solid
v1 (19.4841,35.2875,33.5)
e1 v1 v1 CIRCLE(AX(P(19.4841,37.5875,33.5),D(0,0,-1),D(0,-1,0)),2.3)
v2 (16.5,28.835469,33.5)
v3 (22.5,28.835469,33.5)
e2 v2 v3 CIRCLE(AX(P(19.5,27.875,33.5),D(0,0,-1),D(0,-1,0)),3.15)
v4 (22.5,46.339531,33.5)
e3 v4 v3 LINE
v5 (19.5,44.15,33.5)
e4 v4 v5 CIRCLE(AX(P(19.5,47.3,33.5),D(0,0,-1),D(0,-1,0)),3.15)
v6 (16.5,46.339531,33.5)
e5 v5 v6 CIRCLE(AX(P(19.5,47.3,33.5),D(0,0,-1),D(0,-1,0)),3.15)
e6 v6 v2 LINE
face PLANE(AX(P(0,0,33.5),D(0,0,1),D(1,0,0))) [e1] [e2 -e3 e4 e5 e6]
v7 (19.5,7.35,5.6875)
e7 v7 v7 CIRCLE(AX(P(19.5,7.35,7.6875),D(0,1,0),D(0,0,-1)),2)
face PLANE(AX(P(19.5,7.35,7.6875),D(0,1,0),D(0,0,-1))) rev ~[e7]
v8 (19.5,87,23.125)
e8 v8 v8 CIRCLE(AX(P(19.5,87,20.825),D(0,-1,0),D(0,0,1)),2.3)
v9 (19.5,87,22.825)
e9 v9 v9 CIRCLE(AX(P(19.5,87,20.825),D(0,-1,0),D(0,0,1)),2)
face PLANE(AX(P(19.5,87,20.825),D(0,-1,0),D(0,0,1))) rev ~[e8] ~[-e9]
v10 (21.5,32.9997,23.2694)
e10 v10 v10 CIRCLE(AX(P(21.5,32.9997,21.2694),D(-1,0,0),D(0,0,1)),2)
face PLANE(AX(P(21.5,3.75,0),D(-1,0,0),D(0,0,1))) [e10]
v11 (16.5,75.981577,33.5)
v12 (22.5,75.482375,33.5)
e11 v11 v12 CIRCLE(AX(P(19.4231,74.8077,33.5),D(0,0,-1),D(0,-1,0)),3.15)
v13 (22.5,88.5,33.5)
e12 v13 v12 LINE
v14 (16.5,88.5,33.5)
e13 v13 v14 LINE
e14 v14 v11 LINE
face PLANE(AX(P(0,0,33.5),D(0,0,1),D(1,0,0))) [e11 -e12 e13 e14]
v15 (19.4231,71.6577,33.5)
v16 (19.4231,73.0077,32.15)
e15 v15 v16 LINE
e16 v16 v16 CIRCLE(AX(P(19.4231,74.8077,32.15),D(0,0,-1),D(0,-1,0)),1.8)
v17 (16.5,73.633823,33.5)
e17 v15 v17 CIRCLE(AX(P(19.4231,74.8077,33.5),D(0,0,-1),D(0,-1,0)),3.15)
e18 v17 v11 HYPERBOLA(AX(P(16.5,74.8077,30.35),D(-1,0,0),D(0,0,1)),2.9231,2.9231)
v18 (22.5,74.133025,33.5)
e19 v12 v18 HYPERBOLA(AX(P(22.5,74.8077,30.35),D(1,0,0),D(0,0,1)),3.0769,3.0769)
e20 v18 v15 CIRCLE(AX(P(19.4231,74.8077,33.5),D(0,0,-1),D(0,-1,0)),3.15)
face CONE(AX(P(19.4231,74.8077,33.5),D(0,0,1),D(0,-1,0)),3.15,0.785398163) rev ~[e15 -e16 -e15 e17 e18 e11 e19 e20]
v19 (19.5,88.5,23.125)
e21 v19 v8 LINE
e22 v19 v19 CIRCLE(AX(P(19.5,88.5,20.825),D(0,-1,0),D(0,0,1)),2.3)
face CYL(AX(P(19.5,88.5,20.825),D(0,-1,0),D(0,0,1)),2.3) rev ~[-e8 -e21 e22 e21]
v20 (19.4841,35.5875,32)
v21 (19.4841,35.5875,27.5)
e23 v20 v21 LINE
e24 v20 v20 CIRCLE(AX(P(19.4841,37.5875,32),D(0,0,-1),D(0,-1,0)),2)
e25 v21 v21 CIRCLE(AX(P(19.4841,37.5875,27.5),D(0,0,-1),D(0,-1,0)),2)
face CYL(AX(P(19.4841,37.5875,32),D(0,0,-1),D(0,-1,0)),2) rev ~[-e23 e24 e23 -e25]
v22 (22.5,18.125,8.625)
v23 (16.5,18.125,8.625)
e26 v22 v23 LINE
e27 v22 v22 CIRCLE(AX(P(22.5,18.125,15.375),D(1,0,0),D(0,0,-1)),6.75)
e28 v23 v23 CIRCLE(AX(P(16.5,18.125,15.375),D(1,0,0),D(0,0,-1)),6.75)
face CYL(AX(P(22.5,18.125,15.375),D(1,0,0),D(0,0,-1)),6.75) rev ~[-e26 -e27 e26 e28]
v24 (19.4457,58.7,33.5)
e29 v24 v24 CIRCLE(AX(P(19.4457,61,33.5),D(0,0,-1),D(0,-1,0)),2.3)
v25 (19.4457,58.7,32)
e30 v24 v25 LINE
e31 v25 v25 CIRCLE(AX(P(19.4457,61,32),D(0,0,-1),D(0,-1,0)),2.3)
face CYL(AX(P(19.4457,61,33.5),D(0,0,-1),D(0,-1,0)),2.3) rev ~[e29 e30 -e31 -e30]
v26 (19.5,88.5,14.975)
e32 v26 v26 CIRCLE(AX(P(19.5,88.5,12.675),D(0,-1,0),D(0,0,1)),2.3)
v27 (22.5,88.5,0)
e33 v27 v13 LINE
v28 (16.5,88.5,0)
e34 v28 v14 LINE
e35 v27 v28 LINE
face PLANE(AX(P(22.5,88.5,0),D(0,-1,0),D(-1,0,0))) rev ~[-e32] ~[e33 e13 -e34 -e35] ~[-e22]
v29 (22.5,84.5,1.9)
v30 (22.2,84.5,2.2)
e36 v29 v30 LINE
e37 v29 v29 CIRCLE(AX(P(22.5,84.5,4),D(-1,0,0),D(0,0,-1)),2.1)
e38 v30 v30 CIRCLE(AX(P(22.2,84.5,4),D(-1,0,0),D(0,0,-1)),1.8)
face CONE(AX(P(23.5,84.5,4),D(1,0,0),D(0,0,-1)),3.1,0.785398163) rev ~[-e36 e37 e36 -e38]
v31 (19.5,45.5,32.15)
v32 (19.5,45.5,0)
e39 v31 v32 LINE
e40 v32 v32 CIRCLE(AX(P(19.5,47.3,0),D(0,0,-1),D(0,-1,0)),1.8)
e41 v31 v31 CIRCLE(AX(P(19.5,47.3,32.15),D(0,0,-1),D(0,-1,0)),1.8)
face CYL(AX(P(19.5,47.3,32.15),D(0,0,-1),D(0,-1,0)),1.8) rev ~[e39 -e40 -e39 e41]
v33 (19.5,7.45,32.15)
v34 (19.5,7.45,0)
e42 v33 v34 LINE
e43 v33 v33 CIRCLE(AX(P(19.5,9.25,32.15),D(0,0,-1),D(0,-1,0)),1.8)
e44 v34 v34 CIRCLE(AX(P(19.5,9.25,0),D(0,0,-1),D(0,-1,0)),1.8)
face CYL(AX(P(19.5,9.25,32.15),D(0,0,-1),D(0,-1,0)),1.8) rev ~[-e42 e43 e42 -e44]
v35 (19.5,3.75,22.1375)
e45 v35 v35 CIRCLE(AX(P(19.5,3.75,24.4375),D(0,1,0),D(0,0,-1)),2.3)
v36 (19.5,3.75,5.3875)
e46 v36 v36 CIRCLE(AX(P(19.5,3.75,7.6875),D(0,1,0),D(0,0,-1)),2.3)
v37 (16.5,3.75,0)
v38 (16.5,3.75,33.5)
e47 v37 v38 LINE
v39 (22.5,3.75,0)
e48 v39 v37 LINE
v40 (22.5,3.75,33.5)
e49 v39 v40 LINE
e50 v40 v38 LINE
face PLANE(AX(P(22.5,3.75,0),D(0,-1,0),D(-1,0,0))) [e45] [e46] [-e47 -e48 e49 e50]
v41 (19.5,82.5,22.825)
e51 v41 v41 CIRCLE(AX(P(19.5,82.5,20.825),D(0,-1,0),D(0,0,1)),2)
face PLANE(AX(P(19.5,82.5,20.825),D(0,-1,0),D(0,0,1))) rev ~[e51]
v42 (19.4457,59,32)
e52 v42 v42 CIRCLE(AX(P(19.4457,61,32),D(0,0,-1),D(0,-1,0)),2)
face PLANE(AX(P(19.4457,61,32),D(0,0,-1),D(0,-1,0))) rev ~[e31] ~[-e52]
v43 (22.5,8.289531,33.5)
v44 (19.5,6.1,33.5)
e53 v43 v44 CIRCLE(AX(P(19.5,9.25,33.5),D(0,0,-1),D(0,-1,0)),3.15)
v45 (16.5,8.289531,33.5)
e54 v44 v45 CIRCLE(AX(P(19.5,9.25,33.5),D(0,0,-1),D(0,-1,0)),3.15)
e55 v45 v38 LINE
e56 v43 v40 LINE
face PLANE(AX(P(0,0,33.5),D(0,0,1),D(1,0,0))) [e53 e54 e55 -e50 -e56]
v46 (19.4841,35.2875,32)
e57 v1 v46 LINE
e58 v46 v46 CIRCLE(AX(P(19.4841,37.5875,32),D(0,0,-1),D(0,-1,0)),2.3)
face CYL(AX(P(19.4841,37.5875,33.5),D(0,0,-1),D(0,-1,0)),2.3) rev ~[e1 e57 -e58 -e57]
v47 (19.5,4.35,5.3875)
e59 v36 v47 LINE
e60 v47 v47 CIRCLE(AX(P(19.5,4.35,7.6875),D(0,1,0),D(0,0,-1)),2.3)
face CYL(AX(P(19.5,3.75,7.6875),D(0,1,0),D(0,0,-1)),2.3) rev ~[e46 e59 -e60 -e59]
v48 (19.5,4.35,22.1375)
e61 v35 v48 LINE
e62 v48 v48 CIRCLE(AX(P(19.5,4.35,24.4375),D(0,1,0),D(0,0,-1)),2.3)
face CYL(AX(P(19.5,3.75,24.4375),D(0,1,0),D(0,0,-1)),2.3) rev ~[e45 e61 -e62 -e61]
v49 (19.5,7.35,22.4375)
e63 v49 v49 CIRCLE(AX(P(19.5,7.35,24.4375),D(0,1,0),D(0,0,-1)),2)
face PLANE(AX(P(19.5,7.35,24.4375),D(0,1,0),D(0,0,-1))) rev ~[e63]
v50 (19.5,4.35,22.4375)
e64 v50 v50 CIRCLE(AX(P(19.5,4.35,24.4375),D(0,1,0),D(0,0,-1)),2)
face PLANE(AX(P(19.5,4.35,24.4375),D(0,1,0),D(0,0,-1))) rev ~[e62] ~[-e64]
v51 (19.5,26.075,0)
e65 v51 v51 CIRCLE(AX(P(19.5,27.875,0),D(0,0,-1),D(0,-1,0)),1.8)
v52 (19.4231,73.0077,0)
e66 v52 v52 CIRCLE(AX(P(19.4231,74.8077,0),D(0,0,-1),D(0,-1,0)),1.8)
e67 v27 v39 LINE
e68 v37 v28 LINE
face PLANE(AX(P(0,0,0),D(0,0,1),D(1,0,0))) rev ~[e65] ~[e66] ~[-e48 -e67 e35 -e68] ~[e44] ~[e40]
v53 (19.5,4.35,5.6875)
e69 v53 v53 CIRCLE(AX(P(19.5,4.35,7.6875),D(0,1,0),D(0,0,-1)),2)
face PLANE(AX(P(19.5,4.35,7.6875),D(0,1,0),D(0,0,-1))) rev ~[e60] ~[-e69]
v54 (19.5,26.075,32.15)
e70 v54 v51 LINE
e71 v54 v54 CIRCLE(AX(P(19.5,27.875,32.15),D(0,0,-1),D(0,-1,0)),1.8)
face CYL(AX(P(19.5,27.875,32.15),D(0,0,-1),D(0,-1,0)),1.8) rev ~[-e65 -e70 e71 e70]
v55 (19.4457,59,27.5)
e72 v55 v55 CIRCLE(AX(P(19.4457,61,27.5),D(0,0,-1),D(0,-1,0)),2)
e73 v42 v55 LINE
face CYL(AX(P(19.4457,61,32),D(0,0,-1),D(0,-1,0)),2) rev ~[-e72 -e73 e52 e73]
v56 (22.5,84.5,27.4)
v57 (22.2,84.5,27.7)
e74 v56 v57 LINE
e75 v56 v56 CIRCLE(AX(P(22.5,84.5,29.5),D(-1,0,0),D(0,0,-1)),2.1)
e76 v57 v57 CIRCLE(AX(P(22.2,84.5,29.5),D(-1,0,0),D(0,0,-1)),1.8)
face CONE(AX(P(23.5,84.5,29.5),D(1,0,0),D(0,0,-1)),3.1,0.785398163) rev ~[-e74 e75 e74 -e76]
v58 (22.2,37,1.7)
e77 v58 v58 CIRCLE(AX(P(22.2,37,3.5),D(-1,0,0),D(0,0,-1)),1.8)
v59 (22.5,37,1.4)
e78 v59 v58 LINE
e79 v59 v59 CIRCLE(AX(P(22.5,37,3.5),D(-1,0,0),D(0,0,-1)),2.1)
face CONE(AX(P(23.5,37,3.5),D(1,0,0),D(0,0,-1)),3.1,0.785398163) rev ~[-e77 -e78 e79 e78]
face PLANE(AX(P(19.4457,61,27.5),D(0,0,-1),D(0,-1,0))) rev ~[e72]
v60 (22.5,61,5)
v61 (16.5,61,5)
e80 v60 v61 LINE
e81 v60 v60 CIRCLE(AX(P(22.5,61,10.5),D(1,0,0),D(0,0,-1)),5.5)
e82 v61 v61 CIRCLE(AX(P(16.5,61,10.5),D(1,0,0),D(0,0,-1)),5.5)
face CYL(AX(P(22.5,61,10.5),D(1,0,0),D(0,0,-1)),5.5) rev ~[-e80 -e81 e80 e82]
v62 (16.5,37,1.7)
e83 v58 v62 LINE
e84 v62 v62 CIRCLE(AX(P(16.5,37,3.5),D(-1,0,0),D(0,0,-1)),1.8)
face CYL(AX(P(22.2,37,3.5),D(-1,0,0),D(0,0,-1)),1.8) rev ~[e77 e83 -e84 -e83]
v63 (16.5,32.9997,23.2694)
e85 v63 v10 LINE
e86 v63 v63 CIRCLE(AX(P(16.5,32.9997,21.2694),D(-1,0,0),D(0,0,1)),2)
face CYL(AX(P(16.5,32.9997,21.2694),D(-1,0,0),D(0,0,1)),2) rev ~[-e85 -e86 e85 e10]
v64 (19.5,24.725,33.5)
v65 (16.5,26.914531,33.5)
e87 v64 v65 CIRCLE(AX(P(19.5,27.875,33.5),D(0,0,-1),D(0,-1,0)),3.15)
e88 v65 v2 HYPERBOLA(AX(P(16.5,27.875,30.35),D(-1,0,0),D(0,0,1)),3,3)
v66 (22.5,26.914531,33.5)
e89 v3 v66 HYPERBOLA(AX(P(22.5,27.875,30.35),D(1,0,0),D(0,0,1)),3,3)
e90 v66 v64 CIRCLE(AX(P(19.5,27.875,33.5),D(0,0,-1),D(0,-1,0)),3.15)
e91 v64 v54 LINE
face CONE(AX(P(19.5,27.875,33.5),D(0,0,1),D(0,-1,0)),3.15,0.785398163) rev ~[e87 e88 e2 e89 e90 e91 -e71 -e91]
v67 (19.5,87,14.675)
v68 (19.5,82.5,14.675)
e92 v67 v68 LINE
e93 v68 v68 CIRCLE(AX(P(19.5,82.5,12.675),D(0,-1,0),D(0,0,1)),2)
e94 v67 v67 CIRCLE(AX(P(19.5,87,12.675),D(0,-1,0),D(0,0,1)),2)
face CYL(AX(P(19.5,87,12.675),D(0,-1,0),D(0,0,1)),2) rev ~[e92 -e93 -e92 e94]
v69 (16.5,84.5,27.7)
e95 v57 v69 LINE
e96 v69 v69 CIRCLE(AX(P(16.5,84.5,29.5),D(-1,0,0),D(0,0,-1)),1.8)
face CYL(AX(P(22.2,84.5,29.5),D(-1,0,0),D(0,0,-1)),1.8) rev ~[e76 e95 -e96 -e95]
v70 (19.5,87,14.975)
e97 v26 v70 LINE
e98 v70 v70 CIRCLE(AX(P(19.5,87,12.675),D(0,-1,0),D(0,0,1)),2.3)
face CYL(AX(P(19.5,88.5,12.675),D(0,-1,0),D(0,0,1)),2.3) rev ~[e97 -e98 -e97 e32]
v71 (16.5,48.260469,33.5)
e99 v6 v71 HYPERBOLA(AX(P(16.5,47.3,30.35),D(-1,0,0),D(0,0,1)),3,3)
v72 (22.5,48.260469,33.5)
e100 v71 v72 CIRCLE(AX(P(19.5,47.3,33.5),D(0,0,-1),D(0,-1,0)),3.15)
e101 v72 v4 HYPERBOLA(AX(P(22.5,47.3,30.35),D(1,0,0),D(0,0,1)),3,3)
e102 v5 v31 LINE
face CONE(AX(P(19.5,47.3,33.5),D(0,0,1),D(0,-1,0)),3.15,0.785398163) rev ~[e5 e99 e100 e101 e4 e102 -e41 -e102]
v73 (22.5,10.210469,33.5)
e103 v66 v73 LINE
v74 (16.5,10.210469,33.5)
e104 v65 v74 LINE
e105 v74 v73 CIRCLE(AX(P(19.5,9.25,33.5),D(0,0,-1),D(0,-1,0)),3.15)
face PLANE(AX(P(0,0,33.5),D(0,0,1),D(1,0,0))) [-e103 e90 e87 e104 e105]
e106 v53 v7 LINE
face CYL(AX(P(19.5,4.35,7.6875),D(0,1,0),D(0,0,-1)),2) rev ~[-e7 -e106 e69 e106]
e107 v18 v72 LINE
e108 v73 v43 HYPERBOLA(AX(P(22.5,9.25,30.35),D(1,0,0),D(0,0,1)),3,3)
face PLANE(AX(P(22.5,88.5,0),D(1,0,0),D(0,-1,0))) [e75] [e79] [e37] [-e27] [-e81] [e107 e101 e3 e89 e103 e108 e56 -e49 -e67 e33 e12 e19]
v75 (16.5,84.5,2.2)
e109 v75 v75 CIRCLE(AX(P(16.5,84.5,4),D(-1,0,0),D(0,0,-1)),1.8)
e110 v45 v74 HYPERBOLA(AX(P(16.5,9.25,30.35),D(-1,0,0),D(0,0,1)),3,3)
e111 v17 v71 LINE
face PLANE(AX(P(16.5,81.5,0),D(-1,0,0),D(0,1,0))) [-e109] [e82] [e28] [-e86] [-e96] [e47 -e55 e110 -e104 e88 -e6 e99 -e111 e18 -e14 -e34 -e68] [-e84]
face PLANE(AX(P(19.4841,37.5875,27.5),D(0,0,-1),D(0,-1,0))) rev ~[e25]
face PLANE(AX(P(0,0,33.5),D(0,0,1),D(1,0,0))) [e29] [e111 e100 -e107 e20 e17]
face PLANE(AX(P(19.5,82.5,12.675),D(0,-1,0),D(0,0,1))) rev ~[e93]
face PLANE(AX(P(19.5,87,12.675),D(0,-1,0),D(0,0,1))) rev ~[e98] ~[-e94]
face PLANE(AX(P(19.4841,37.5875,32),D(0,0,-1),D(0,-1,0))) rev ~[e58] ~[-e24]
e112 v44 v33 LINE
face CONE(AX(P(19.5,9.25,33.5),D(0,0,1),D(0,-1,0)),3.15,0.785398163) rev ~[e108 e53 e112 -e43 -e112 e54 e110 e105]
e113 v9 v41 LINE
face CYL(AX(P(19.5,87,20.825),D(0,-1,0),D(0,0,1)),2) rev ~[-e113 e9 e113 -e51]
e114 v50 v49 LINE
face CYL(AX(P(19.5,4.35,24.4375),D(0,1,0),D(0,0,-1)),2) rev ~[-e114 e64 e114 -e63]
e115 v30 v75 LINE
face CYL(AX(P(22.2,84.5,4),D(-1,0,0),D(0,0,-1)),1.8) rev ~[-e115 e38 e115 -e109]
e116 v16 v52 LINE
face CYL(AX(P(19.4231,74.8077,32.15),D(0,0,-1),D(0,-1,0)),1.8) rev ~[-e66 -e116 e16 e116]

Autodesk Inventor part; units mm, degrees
ref_plane "YZ Plane" through (0, 0, 0) normal (1, 0, 0) x (0, 1, 0)
ref_plane "XZ Plane" through (0, 0, 0) normal (0, 1, 0) x (-1, 0, 0)
ref_plane "Work Plane1" through (0, 0, 0) normal (0, 0, 1) x (1, 0, 0)
sketch "Sketch1" plane through (0, 0, 0) normal (0, 0, 1) x (1, 0, 0)
  line L0 (23.5, 88.5) -> (-23.5, 88.5) projected
  line L1 (-23.5, 88.5) -> (-23.5, 36.5) projected
  line L2 (-26.5, 33.5) -> (-89, 33.5) projected
  line L3 (-89, 33.5) -> (-89, -72.5) projected
  line L4 (-89, -72.5) -> (-77, -72.5) projected
  line L5 (-74, -75.5) -> (-74, -93.5) projected
  line L6 (-74, -93.5) -> (74, -93.5) projected
  line L7 (74, -93.5) -> (74, -75.5) projected
  line L8 (77, -72.5) -> (89, -72.5) projected
  line L9 (89, -72.5) -> (89, 33.5) projected
  line L10 (89, 33.5) -> (26.5, 33.5) projected
  line L11 (23.5, 36.5) -> (23.5, 88.5) projected
  line L12 (-4.5, 81.5) -> (-4.5, 36.5) projected
  line L13 (-7.5, 33.5) -> (-13.5, 33.5) projected
  line L14 (-16.5, 36.5) -> (-16.5, 81.5) projected
  line L15 (-13.5, 84.5) -> (-7.5, 84.5) projected
  line L16 (16.5, 81.5) -> (16.5, 36.5) projected
  line L17 (13.5, 33.5) -> (7.5, 33.5) projected
  line L18 (4.5, 36.5) -> (4.5, 81.5) projected
  line L19 (7.5, 84.5) -> (13.5, 84.5) projected
  line L20 (16.5, 88.5) -> (22.5, 88.5)
  line L21 (22.5, 88.5) -> (22.5, 3.75)
  line L22 (22.5, 3.75) -> (16.5, 3.75)
  line L23 (16.5, 3.75) -> (16.5, 88.5)
  line L24 (59.9, 4.75) -> (32.2, 4.75)
  arc A0 (13.5, 33.5) -> (16.5, 36.5) centre (13.5, 36.5) ccw projected
  arc A1 (4.5, 36.5) -> (7.5, 33.5) centre (7.5, 36.5) ccw projected
  arc A2 (7.5, 84.5) -> (4.5, 81.5) centre (7.5, 81.5) ccw projected
  arc A3 (16.5, 81.5) -> (13.5, 84.5) centre (13.5, 81.5) ccw projected
  arc A4 (-4.5, 81.5) -> (-7.5, 84.5) centre (-7.5, 81.5) ccw projected
  arc A5 (-7.5, 33.5) -> (-4.5, 36.5) centre (-7.5, 36.5) ccw projected
  arc A6 (-16.5, 36.5) -> (-13.5, 33.5) centre (-13.5, 36.5) ccw projected
  arc A7 (-13.5, 84.5) -> (-16.5, 81.5) centre (-13.5, 81.5) ccw projected
  arc A8 (-26.5, 33.5) -> (-23.5, 36.5) centre (-26.5, 36.5) ccw projected
  arc A9 (-74, -75.5) -> (-77, -72.5) centre (-77, -75.5) ccw projected
  arc A10 (77, -72.5) -> (74, -75.5) centre (77, -75.5) ccw projected
  arc A11 (23.5, 36.5) -> (26.5, 33.5) centre (26.5, 36.5) ccw projected
  point P0 (0, 0)
  dimension "d0" = 1
  dimension "d1" = 1
ref_plane "Work Plane2" through (-89, -40.3889, 33.5) normal (0, 0, 1) x (1, 0, 0)
extrude "Extrusion1" add sketch "Sketch1" along normal up to surface (33.5 mm away) contours L21 L22 L23 L16 L0
sketch "Sketch2" plane through (22.5, 3.75, 0) normal (1, 0, 0) x (0, 0, -1)
  circle A0 centre (-15.375, 14.375) radius 6.75 projected
  circle A1 centre (-10.5, 57.25) radius 5.5 projected
  point P0 (0, -3.75)
  dimension "d8" = 11
extrude "Extrusion2" cut sketch "Sketch2" against normal up to next
sketch "Sketch3" plane through (16.5, 3.75, 0) normal (-1, 0, 0) x (0, 0, 1)
  circle A0 centre (21.2694, 29.2497) radius 2 projected
  point P0 (0, -3.75)
extrude "Extrusion3" cut sketch "Sketch3" against normal blind 5
ref_plane "Work Plane3" through (23.5, 3.75, 0) normal (1, 0, 0) x (0, 0, -1)
sketch "Sketch4" plane through (23.5, 3.75, 0) normal (1, 0, 0) x (0, 0, -1)
  circle A0 centre (-29.5, 80.75) radius 1.8 projected
  circle A1 centre (-3.5, 33.25) radius 1.8 projected
  circle A2 centre (-4, 80.75) radius 1.8 projected
  point P0 (0, -3.75)
hole "Hole1" at (23.5, 37, 3.5) at (23.5, 84.5, 4) at (23.5, 84.5, 29.5) direction (-1, 0, 0) diameter 3.6 end through all countersink diameter 6.2 countersink angle 90 clearance for "Countersunk Flat Head Screw ISO 2009/7046" size "M3" standard "ISO"
sketch "Sketch5" plane through (16.5, 3.75, 33.5) normal (0, 0, 1) x (1, 0, 0)
  circle A0 centre (-36, 5.5) radius 1.8 projected
  circle A1 centre (-36, 24.125) radius 1.8 projected
  circle A2 centre (-36, 43.55) radius 1.8 projected
  circle A3 centre (-35.9231, 71.0577) radius 1.8 projected
  circle A4 centre (-16.5, 44.3) radius 3.3 projected
  circle A5 centre (-16.5, 14.375) radius 3.3 projected
  circle A6 centre (-16.5, 69.95) radius 3.3 projected
  line L0 (-12, 0) -> (-21, 0) projected
  line L1 (-12, 84.75) -> (-12, 0) projected
  line L2 (-21, 84.75) -> (-12, 84.75) projected
  line L3 (-21, 0) -> (-21, 84.75) projected
  line L4 (-16.5, 0) -> (-16.5, 84.75)
  circle A7 centre (3, 5.5) radius 1.8
  circle A8 centre (3, 24.125) radius 1.8
  circle A9 centre (3, 43.55) radius 1.8
  circle A10 centre (2.9231, 71.0577) radius 1.8
  circle A11 centre (-16.5, 29.2497) radius 2.3 projected
  circle A12 centre (-16.5, 57.25) radius 2.3 projected
  point P0 (-16.5, -3.75)
hole "Hole2" at (19.5, 9.25, 33.5) at (19.5, 27.875, 33.5) at (19.5, 47.3, 33.5) at (19.4231, 74.8077, 33.5) direction (0, 0, -1) diameter 3.6 end through all countersink diameter 6.3 countersink angle 90 clearance for "Countersunk Flat Head Screw ISO 2009/7046" size "M3" standard "ISO"
sketch "Sketch6" plane through (16.5, 3.75, 0) normal (0, -1, 0) x (1, 0, 0)
  line L0 (6, 33.5) -> (0, 33.5) projected
  line L1 (0, 0) -> (0, 33.5) projected
  line L2 (0, 0) -> (6, 0) projected
  line L3 (6, 0) -> (6, 33.5) projected
  line L4 (0, 8.625) -> (0, 22.125) projected
  line L5 (0, 15.375) -> (6, 15.375)
  line L6 (6, 16) -> (6, 5) projected
  line L7 (0, 33.5) -> (6, 15.375)
  line L8 (0, 0) -> (0, 33.5) projected
  line L9 (0, 0) -> (6, 15.375)
  line L10 (6, 0) -> (0, 15.375)
  line L11 (0, 15.375) -> (6, 33.5)
  point P0 (-16.5, 0)
  point P1 (3, 24.4375)
  point P2 (3, 7.6875)
hole "Hole3" at (19.5, 3.75, 24.4375) at (19.5, 3.75, 7.6875) direction (0, 1, 0) diameter 4 depth 3.6 counterbore diameter 4.6 counterbore depth 0.6
sketch "Sketch7" plane through (16.5, 88.5, 0) normal (0, 1, 0) x (1, 0, 0)
  line L0 (0, -33.5) -> (6, -33.5) projected
  line L1 (6, 0) -> (6, -33.5) projected
  line L2 (6, 0) -> (0, 0) projected
  line L3 (0, 0) -> (0, -33.5) projected
  circle A0 centre (-16.5, -12.675) radius 2 projected
  circle A1 centre (-16.5, -20.825) radius 2 projected
  line L4 (-16.5, -20.825) -> (6, -20.825)
  line L5 (-16.5, -12.675) -> (6, -12.675)
  line L6 (6, -5) -> (6, -16) projected
  point P0 (-16.5, 0)
  point P1 (3, -20.825)
  point P2 (3, -12.675)
hole "Hole4" at (19.5, 88.5, 20.825) at (19.5, 88.5, 12.675) direction (0, -1, 0) diameter 4 depth 6 counterbore diameter 4.6 counterbore depth 1.5
sketch "Sketch8" plane through (19.5, 47.3, 33.5) normal (0, 0, 1) x (1, 0, 0)
  circle A0 centre (-39, -9.7125) radius 2.3 projected
  circle A1 centre (-39, 13.7) radius 2.3 projected
  arc A2 (3, 0.9605) -> (-3, 0.9605) centre (0, 0) ccw projected
  line L0 (3, 26.8331) -> (3, 0.9605) projected
  arc A3 (-3, 26.3338) -> (3, 26.8331) centre (-0.0769, 27.5077) ccw projected
  line L1 (-3, 0.9605) -> (-3, 26.3338) projected
  arc A4 (-3, -0.9605) -> (3, -0.9605) centre (0, 0) ccw projected
  line L2 (-3, -18.4645) -> (-3, -0.9605) projected
  arc A5 (3, -18.4645) -> (-3, -18.4645) centre (0, -19.425) ccw projected
  line L3 (3, -0.9605) -> (3, -18.4645) projected
  line L4 (-39, 13.7) -> (3, 13.7)
  line L5 (3, 19.2) -> (3, 8.2) projected
  line L6 (-39, -9.7125) -> (3, -9.7125)
  circle A6 centre (0, -19.425) radius 1.8 projected
  line L7 (0, -19.425) -> (-0.0769, 27.5077)
  point P0 (-19.5, -47.3)
  point P1 (-0.0543, 13.7)
  point P2 (-0.0159, -9.7125)
hole "Hole5" at (19.4457, 61, 33.5) at (19.4841, 37.5875, 33.5) direction (0, 0, -1) diameter 4 depth 6 counterbore diameter 4.6 counterbore depth 1.5
properties part number "left_gear_holder"
